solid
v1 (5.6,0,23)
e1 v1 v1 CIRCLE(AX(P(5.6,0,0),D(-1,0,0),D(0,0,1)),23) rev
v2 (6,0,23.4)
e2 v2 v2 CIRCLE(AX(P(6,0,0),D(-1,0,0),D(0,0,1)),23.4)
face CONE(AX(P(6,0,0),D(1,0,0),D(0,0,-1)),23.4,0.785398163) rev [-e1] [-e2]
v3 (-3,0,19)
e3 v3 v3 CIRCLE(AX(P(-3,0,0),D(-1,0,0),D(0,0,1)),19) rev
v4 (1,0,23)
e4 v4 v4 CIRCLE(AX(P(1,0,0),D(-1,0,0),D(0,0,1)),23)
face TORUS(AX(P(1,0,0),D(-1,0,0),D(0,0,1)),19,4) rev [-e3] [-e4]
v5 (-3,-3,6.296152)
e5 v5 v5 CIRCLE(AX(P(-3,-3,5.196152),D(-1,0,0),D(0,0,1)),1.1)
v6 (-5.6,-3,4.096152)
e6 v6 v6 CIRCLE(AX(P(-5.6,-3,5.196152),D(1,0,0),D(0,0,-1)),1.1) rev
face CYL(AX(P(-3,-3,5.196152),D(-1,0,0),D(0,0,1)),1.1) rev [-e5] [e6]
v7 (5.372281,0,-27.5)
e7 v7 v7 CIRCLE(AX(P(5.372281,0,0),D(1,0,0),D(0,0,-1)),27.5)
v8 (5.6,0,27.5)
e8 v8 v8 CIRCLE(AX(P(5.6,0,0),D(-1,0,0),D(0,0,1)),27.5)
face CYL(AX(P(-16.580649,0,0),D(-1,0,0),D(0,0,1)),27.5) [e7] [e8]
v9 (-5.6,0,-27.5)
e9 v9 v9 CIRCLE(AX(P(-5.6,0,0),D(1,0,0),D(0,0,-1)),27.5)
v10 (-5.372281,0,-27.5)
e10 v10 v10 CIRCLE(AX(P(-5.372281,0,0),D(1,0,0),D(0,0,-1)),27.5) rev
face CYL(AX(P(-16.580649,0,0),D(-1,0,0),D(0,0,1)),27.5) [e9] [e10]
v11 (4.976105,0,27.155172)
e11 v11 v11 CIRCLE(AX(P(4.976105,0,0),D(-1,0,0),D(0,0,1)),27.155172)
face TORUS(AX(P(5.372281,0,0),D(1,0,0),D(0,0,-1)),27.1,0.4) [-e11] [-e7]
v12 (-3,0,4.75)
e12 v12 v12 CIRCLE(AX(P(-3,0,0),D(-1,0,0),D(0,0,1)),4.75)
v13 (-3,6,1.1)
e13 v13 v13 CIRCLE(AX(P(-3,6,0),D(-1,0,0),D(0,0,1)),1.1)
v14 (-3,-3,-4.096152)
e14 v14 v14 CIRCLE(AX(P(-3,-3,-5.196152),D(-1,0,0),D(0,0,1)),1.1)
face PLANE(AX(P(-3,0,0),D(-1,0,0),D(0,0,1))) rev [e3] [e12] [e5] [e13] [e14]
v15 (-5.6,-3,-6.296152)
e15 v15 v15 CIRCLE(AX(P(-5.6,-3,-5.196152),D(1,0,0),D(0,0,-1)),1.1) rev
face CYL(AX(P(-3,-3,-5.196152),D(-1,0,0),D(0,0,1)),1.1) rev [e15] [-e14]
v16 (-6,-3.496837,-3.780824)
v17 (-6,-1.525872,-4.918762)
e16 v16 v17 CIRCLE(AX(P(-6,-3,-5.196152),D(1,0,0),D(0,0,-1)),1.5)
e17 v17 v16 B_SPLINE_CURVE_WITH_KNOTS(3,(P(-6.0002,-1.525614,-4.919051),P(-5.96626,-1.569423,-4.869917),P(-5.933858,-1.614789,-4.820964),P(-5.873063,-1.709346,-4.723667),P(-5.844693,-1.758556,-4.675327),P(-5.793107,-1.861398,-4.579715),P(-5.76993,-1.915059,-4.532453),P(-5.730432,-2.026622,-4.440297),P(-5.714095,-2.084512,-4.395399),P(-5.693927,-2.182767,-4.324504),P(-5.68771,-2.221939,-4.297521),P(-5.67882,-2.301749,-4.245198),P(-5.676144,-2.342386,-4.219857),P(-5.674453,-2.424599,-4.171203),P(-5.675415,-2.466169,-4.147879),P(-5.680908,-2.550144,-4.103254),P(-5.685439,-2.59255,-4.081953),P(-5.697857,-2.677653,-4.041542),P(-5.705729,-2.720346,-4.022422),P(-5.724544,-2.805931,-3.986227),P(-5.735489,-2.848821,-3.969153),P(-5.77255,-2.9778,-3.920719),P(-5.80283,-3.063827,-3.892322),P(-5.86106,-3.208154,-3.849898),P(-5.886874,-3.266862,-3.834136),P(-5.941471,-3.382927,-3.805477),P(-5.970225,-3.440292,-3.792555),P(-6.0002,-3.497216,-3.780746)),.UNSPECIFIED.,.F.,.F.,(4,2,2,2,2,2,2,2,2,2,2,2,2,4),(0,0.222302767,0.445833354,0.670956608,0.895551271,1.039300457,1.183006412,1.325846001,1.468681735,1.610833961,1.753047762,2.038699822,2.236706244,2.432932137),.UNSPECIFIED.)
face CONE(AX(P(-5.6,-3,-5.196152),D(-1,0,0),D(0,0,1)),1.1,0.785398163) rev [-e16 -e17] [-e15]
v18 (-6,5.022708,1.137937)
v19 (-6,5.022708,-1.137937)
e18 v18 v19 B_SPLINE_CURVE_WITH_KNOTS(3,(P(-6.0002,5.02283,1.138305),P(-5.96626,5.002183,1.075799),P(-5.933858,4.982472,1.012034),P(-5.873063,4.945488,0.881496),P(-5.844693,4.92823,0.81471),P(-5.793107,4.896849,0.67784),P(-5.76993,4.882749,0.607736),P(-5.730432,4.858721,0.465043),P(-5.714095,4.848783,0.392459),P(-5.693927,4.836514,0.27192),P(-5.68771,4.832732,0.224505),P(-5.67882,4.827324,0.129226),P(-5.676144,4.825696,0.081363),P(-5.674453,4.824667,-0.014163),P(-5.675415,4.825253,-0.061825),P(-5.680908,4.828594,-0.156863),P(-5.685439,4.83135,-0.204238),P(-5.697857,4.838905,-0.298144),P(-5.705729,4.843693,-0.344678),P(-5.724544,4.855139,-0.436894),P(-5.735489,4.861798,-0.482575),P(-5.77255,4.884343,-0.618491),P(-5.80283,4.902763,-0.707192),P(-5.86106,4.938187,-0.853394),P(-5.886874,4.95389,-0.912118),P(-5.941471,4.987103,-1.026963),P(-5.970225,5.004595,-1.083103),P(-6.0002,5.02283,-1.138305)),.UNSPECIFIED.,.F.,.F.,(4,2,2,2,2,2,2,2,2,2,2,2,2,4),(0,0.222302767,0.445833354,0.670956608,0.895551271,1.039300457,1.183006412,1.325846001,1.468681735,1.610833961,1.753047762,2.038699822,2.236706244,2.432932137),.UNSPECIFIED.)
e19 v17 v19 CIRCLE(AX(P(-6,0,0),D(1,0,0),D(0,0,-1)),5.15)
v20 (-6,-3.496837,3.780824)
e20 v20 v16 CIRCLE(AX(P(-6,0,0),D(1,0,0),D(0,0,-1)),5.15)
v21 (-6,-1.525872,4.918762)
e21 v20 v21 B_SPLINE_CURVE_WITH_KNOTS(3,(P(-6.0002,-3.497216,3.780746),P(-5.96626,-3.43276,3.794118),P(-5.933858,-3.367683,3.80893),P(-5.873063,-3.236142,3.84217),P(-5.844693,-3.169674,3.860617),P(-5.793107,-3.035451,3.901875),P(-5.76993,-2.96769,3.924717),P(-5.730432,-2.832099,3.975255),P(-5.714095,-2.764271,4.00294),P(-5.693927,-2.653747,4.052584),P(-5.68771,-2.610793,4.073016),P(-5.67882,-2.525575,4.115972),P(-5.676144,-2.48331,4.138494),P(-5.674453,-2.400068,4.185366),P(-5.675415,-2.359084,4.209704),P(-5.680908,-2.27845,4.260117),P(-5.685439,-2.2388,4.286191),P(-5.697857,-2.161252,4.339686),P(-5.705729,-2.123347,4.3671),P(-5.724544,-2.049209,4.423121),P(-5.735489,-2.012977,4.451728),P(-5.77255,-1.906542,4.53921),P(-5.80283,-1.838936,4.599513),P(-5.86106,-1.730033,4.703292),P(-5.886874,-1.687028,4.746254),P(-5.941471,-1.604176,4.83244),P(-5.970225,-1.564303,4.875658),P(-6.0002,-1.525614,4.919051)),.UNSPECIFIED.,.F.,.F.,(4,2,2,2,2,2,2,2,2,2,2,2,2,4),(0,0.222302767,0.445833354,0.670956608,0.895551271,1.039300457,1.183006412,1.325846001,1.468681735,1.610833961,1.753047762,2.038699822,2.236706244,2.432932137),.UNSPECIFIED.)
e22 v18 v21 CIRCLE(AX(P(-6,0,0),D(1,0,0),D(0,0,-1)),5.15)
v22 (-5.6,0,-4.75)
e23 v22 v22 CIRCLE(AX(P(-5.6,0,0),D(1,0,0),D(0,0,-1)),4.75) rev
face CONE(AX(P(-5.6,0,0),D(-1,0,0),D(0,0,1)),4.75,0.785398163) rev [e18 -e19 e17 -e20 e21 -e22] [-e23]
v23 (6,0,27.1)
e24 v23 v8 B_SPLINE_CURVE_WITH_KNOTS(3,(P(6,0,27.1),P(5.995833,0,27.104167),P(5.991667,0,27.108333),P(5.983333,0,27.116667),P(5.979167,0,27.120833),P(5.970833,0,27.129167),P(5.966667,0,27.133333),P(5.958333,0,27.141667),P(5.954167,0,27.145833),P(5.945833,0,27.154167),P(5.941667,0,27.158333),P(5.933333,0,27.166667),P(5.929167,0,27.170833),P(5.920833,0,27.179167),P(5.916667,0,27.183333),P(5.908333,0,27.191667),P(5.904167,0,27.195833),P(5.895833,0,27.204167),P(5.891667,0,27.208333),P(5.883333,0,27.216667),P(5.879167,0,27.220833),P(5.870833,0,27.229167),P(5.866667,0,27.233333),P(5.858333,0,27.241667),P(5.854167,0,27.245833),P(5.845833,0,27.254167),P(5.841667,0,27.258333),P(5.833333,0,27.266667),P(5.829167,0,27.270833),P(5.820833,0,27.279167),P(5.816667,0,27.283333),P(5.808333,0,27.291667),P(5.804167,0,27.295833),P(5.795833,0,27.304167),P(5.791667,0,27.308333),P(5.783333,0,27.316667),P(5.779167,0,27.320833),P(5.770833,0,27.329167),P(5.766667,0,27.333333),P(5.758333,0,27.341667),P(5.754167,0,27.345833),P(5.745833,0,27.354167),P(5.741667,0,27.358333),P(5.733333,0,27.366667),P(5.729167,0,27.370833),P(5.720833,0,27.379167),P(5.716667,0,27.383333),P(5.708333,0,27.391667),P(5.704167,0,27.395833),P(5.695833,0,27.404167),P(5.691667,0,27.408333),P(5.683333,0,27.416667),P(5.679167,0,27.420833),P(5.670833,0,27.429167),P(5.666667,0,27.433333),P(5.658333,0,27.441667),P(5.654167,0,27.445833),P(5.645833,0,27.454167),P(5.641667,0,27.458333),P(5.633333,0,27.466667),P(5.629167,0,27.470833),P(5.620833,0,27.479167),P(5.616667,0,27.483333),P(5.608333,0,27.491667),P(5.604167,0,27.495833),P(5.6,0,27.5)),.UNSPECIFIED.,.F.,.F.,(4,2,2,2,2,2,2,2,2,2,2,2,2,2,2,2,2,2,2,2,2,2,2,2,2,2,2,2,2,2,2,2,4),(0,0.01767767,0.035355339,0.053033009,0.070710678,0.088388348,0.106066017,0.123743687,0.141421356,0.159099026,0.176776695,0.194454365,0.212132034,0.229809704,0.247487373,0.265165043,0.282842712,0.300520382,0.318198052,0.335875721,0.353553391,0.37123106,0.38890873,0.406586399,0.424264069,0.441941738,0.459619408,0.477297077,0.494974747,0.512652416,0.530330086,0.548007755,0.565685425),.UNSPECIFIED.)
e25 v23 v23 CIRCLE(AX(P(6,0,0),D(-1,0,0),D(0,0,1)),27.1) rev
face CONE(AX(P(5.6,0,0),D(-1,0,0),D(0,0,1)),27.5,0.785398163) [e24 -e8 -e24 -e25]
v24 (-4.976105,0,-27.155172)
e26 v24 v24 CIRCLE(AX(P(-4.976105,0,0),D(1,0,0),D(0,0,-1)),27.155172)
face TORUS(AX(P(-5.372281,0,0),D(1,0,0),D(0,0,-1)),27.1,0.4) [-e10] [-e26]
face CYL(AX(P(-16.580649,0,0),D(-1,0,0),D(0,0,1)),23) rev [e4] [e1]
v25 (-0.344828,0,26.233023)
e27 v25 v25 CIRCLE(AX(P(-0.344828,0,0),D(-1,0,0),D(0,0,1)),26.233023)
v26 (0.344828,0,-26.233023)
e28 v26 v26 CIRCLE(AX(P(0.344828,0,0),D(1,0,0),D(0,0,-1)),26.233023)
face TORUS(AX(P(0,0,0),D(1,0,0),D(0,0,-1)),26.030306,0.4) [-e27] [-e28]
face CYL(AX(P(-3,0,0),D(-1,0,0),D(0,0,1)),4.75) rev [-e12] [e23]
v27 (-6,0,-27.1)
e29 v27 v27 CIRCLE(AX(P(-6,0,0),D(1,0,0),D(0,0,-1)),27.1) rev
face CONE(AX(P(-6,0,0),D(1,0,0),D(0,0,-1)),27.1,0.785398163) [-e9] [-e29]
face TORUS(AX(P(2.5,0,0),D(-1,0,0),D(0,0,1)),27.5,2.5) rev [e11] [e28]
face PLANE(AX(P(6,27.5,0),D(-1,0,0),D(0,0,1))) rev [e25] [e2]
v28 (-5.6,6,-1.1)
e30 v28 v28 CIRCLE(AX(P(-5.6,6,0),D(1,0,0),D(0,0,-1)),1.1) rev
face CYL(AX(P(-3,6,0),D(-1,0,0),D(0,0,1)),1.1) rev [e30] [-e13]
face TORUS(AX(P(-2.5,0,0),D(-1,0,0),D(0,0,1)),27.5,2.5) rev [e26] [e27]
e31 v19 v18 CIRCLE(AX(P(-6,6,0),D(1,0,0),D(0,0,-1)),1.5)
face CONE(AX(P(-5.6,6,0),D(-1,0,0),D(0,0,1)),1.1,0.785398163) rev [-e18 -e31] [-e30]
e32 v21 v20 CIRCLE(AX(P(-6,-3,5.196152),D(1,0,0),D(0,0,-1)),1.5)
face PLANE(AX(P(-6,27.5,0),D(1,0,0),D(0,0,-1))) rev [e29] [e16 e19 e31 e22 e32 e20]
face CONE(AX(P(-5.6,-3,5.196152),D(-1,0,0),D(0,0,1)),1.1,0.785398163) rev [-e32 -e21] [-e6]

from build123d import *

# Parameters (mm, degrees)
FILLET_1_R      = 0.4
SKETCH_4_R      = 23
SKETCH_4_R_2    = 1.1
SKETCH_4_R_3    = 4.75
EXTRUDE_1_DEPTH = 3
CHAMFER_1_SIZE  = 0.4
FILLET_2_R      = 4


with BuildPart() as part:
    # 草图1 → 旋转1 (revolve)
    with BuildSketch(Plane.XY, mode=Mode.PRIVATE) as revolve_1_sk:
        with BuildLine():
            Line((6, 23), (0, 23))
            Line((0, 23), (-6, 23))
            Line((-6, 23), (-6, 27.5))
            Line((-6, 27.5), (-5, 27.5))
            ThreePointArc((-5, 27.5), (-2.5, 25), (0, 27.5))
            ThreePointArc((0, 27.5), (2.5, 25), (5, 27.5))
            Line((5, 27.5), (6, 27.5))
            Line((6, 27.5), (6, 23))
        make_face()
    revolve(revolve_1_sk.sketch.rotate(Axis((-16.580648815, 0, 0), (1, 0, 0)), 90), axis=Axis((-16.580648815, 0, 0), (1, 0, 0)))

    # 圆角1
    fillet_1_edges = [part.edges().sort_by_distance(p)[0] for p in [
        (0, 0, -27.5),
        (5, 0, -27.5),
        (-5, 0, -27.5),
    ]]
    fillet(fillet_1_edges, radius=FILLET_1_R)

    # 草图4 → 凸台-拉伸1 (add)
    with BuildSketch(Plane.ZY.offset(6)):
        Circle(SKETCH_4_R)
        with Locations((0, 6)):
            Circle(SKETCH_4_R_2, mode=Mode.SUBTRACT)
        with Locations((5.196152423, -3)):
            Circle(SKETCH_4_R_2, mode=Mode.SUBTRACT)
        with Locations((-5.196152423, -3)):
            Circle(SKETCH_4_R_2, mode=Mode.SUBTRACT)
        Circle(SKETCH_4_R_3, mode=Mode.SUBTRACT)
    extrude(amount=-EXTRUDE_1_DEPTH)

    # 倒角1
    # the kernel refuses this chamfer: 0.4 mm, written as the material it takes off along each edge
    with BuildSketch(Plane(origin=(-6, 0, 0), x_dir=(0, 0, 1), z_dir=(0, -1, 0))) as chamfer_1_piece_1:
        Polygon((4.75 + CHAMFER_1_SIZE, 0), (4.75, -CHAMFER_1_SIZE), (4.75, 0), align=None)
    revolve(axis=Axis((-6, 0, 0), (-1, 0, 0)), mode=Mode.SUBTRACT)
    with BuildSketch(Plane(origin=(-6, 6, 0), x_dir=(0, 0, 1), z_dir=(0, -1, 0))) as chamfer_1_piece_2:
        Polygon((1.1 + CHAMFER_1_SIZE, 0), (1.1, -CHAMFER_1_SIZE), (1.1, 0), align=None)
    revolve(axis=Axis((-6, 6, 0), (-1, 0, 0)), mode=Mode.SUBTRACT)
    with BuildSketch(Plane(origin=(-6, -3, 5.196152423), x_dir=(0, 0, 1), z_dir=(0, -1, 0))) as chamfer_1_piece_3:
        Polygon((1.1 + CHAMFER_1_SIZE, 0), (1.1, -CHAMFER_1_SIZE), (1.1, 0), align=None)
    revolve(axis=Axis((-6, -3, 5.196152423), (-1, 0, 0)), mode=Mode.SUBTRACT)
    with BuildSketch(Plane(origin=(-6, -3, -5.196152423), x_dir=(0, 0, 1), z_dir=(0, -1, 0))) as chamfer_1_piece_4:
        Polygon((1.1 + CHAMFER_1_SIZE, 0), (1.1, -CHAMFER_1_SIZE), (1.1, 0), align=None)
    revolve(axis=Axis((-6, -3, -5.196152423), (-1, 0, 0)), mode=Mode.SUBTRACT)
    with BuildSketch(Plane(origin=(6, 0, 0), x_dir=(0, 0, 1), z_dir=(0, 1, 0))) as chamfer_1_piece_5:
        Polygon((27.5, -CHAMFER_1_SIZE), (27.5 - CHAMFER_1_SIZE, 0), (27.5, 0), align=None)
    revolve(axis=Axis((6, 0, 0), (1, 0, 0)), mode=Mode.SUBTRACT)
    with BuildSketch(Plane(origin=(6, 0, 0), x_dir=(0, 0, 1), z_dir=(0, 1, 0))) as chamfer_1_piece_6:
        Polygon((23, -CHAMFER_1_SIZE), (23 + CHAMFER_1_SIZE, 0), (23, 0), align=None)
    revolve(axis=Axis((6, 0, 0), (1, 0, 0)), mode=Mode.SUBTRACT)
    with BuildSketch(Plane(origin=(-6, 0, 0), x_dir=(0, 0, 1), z_dir=(0, 1, 0))) as chamfer_1_piece_7:
        Polygon((27.5, CHAMFER_1_SIZE), (27.5 - CHAMFER_1_SIZE, 0), (27.5, 0), align=None)
    revolve(axis=Axis((-6, 0, 0), (1, 0, 0)), mode=Mode.SUBTRACT)

    # 圆角2
    fillet_2_edges = [part.edges().sort_by_distance(p)[0] for p in [
        (-3, 0, -23),
    ]]
    fillet(fillet_2_edges, radius=FILLET_2_R)


solid = part.part
